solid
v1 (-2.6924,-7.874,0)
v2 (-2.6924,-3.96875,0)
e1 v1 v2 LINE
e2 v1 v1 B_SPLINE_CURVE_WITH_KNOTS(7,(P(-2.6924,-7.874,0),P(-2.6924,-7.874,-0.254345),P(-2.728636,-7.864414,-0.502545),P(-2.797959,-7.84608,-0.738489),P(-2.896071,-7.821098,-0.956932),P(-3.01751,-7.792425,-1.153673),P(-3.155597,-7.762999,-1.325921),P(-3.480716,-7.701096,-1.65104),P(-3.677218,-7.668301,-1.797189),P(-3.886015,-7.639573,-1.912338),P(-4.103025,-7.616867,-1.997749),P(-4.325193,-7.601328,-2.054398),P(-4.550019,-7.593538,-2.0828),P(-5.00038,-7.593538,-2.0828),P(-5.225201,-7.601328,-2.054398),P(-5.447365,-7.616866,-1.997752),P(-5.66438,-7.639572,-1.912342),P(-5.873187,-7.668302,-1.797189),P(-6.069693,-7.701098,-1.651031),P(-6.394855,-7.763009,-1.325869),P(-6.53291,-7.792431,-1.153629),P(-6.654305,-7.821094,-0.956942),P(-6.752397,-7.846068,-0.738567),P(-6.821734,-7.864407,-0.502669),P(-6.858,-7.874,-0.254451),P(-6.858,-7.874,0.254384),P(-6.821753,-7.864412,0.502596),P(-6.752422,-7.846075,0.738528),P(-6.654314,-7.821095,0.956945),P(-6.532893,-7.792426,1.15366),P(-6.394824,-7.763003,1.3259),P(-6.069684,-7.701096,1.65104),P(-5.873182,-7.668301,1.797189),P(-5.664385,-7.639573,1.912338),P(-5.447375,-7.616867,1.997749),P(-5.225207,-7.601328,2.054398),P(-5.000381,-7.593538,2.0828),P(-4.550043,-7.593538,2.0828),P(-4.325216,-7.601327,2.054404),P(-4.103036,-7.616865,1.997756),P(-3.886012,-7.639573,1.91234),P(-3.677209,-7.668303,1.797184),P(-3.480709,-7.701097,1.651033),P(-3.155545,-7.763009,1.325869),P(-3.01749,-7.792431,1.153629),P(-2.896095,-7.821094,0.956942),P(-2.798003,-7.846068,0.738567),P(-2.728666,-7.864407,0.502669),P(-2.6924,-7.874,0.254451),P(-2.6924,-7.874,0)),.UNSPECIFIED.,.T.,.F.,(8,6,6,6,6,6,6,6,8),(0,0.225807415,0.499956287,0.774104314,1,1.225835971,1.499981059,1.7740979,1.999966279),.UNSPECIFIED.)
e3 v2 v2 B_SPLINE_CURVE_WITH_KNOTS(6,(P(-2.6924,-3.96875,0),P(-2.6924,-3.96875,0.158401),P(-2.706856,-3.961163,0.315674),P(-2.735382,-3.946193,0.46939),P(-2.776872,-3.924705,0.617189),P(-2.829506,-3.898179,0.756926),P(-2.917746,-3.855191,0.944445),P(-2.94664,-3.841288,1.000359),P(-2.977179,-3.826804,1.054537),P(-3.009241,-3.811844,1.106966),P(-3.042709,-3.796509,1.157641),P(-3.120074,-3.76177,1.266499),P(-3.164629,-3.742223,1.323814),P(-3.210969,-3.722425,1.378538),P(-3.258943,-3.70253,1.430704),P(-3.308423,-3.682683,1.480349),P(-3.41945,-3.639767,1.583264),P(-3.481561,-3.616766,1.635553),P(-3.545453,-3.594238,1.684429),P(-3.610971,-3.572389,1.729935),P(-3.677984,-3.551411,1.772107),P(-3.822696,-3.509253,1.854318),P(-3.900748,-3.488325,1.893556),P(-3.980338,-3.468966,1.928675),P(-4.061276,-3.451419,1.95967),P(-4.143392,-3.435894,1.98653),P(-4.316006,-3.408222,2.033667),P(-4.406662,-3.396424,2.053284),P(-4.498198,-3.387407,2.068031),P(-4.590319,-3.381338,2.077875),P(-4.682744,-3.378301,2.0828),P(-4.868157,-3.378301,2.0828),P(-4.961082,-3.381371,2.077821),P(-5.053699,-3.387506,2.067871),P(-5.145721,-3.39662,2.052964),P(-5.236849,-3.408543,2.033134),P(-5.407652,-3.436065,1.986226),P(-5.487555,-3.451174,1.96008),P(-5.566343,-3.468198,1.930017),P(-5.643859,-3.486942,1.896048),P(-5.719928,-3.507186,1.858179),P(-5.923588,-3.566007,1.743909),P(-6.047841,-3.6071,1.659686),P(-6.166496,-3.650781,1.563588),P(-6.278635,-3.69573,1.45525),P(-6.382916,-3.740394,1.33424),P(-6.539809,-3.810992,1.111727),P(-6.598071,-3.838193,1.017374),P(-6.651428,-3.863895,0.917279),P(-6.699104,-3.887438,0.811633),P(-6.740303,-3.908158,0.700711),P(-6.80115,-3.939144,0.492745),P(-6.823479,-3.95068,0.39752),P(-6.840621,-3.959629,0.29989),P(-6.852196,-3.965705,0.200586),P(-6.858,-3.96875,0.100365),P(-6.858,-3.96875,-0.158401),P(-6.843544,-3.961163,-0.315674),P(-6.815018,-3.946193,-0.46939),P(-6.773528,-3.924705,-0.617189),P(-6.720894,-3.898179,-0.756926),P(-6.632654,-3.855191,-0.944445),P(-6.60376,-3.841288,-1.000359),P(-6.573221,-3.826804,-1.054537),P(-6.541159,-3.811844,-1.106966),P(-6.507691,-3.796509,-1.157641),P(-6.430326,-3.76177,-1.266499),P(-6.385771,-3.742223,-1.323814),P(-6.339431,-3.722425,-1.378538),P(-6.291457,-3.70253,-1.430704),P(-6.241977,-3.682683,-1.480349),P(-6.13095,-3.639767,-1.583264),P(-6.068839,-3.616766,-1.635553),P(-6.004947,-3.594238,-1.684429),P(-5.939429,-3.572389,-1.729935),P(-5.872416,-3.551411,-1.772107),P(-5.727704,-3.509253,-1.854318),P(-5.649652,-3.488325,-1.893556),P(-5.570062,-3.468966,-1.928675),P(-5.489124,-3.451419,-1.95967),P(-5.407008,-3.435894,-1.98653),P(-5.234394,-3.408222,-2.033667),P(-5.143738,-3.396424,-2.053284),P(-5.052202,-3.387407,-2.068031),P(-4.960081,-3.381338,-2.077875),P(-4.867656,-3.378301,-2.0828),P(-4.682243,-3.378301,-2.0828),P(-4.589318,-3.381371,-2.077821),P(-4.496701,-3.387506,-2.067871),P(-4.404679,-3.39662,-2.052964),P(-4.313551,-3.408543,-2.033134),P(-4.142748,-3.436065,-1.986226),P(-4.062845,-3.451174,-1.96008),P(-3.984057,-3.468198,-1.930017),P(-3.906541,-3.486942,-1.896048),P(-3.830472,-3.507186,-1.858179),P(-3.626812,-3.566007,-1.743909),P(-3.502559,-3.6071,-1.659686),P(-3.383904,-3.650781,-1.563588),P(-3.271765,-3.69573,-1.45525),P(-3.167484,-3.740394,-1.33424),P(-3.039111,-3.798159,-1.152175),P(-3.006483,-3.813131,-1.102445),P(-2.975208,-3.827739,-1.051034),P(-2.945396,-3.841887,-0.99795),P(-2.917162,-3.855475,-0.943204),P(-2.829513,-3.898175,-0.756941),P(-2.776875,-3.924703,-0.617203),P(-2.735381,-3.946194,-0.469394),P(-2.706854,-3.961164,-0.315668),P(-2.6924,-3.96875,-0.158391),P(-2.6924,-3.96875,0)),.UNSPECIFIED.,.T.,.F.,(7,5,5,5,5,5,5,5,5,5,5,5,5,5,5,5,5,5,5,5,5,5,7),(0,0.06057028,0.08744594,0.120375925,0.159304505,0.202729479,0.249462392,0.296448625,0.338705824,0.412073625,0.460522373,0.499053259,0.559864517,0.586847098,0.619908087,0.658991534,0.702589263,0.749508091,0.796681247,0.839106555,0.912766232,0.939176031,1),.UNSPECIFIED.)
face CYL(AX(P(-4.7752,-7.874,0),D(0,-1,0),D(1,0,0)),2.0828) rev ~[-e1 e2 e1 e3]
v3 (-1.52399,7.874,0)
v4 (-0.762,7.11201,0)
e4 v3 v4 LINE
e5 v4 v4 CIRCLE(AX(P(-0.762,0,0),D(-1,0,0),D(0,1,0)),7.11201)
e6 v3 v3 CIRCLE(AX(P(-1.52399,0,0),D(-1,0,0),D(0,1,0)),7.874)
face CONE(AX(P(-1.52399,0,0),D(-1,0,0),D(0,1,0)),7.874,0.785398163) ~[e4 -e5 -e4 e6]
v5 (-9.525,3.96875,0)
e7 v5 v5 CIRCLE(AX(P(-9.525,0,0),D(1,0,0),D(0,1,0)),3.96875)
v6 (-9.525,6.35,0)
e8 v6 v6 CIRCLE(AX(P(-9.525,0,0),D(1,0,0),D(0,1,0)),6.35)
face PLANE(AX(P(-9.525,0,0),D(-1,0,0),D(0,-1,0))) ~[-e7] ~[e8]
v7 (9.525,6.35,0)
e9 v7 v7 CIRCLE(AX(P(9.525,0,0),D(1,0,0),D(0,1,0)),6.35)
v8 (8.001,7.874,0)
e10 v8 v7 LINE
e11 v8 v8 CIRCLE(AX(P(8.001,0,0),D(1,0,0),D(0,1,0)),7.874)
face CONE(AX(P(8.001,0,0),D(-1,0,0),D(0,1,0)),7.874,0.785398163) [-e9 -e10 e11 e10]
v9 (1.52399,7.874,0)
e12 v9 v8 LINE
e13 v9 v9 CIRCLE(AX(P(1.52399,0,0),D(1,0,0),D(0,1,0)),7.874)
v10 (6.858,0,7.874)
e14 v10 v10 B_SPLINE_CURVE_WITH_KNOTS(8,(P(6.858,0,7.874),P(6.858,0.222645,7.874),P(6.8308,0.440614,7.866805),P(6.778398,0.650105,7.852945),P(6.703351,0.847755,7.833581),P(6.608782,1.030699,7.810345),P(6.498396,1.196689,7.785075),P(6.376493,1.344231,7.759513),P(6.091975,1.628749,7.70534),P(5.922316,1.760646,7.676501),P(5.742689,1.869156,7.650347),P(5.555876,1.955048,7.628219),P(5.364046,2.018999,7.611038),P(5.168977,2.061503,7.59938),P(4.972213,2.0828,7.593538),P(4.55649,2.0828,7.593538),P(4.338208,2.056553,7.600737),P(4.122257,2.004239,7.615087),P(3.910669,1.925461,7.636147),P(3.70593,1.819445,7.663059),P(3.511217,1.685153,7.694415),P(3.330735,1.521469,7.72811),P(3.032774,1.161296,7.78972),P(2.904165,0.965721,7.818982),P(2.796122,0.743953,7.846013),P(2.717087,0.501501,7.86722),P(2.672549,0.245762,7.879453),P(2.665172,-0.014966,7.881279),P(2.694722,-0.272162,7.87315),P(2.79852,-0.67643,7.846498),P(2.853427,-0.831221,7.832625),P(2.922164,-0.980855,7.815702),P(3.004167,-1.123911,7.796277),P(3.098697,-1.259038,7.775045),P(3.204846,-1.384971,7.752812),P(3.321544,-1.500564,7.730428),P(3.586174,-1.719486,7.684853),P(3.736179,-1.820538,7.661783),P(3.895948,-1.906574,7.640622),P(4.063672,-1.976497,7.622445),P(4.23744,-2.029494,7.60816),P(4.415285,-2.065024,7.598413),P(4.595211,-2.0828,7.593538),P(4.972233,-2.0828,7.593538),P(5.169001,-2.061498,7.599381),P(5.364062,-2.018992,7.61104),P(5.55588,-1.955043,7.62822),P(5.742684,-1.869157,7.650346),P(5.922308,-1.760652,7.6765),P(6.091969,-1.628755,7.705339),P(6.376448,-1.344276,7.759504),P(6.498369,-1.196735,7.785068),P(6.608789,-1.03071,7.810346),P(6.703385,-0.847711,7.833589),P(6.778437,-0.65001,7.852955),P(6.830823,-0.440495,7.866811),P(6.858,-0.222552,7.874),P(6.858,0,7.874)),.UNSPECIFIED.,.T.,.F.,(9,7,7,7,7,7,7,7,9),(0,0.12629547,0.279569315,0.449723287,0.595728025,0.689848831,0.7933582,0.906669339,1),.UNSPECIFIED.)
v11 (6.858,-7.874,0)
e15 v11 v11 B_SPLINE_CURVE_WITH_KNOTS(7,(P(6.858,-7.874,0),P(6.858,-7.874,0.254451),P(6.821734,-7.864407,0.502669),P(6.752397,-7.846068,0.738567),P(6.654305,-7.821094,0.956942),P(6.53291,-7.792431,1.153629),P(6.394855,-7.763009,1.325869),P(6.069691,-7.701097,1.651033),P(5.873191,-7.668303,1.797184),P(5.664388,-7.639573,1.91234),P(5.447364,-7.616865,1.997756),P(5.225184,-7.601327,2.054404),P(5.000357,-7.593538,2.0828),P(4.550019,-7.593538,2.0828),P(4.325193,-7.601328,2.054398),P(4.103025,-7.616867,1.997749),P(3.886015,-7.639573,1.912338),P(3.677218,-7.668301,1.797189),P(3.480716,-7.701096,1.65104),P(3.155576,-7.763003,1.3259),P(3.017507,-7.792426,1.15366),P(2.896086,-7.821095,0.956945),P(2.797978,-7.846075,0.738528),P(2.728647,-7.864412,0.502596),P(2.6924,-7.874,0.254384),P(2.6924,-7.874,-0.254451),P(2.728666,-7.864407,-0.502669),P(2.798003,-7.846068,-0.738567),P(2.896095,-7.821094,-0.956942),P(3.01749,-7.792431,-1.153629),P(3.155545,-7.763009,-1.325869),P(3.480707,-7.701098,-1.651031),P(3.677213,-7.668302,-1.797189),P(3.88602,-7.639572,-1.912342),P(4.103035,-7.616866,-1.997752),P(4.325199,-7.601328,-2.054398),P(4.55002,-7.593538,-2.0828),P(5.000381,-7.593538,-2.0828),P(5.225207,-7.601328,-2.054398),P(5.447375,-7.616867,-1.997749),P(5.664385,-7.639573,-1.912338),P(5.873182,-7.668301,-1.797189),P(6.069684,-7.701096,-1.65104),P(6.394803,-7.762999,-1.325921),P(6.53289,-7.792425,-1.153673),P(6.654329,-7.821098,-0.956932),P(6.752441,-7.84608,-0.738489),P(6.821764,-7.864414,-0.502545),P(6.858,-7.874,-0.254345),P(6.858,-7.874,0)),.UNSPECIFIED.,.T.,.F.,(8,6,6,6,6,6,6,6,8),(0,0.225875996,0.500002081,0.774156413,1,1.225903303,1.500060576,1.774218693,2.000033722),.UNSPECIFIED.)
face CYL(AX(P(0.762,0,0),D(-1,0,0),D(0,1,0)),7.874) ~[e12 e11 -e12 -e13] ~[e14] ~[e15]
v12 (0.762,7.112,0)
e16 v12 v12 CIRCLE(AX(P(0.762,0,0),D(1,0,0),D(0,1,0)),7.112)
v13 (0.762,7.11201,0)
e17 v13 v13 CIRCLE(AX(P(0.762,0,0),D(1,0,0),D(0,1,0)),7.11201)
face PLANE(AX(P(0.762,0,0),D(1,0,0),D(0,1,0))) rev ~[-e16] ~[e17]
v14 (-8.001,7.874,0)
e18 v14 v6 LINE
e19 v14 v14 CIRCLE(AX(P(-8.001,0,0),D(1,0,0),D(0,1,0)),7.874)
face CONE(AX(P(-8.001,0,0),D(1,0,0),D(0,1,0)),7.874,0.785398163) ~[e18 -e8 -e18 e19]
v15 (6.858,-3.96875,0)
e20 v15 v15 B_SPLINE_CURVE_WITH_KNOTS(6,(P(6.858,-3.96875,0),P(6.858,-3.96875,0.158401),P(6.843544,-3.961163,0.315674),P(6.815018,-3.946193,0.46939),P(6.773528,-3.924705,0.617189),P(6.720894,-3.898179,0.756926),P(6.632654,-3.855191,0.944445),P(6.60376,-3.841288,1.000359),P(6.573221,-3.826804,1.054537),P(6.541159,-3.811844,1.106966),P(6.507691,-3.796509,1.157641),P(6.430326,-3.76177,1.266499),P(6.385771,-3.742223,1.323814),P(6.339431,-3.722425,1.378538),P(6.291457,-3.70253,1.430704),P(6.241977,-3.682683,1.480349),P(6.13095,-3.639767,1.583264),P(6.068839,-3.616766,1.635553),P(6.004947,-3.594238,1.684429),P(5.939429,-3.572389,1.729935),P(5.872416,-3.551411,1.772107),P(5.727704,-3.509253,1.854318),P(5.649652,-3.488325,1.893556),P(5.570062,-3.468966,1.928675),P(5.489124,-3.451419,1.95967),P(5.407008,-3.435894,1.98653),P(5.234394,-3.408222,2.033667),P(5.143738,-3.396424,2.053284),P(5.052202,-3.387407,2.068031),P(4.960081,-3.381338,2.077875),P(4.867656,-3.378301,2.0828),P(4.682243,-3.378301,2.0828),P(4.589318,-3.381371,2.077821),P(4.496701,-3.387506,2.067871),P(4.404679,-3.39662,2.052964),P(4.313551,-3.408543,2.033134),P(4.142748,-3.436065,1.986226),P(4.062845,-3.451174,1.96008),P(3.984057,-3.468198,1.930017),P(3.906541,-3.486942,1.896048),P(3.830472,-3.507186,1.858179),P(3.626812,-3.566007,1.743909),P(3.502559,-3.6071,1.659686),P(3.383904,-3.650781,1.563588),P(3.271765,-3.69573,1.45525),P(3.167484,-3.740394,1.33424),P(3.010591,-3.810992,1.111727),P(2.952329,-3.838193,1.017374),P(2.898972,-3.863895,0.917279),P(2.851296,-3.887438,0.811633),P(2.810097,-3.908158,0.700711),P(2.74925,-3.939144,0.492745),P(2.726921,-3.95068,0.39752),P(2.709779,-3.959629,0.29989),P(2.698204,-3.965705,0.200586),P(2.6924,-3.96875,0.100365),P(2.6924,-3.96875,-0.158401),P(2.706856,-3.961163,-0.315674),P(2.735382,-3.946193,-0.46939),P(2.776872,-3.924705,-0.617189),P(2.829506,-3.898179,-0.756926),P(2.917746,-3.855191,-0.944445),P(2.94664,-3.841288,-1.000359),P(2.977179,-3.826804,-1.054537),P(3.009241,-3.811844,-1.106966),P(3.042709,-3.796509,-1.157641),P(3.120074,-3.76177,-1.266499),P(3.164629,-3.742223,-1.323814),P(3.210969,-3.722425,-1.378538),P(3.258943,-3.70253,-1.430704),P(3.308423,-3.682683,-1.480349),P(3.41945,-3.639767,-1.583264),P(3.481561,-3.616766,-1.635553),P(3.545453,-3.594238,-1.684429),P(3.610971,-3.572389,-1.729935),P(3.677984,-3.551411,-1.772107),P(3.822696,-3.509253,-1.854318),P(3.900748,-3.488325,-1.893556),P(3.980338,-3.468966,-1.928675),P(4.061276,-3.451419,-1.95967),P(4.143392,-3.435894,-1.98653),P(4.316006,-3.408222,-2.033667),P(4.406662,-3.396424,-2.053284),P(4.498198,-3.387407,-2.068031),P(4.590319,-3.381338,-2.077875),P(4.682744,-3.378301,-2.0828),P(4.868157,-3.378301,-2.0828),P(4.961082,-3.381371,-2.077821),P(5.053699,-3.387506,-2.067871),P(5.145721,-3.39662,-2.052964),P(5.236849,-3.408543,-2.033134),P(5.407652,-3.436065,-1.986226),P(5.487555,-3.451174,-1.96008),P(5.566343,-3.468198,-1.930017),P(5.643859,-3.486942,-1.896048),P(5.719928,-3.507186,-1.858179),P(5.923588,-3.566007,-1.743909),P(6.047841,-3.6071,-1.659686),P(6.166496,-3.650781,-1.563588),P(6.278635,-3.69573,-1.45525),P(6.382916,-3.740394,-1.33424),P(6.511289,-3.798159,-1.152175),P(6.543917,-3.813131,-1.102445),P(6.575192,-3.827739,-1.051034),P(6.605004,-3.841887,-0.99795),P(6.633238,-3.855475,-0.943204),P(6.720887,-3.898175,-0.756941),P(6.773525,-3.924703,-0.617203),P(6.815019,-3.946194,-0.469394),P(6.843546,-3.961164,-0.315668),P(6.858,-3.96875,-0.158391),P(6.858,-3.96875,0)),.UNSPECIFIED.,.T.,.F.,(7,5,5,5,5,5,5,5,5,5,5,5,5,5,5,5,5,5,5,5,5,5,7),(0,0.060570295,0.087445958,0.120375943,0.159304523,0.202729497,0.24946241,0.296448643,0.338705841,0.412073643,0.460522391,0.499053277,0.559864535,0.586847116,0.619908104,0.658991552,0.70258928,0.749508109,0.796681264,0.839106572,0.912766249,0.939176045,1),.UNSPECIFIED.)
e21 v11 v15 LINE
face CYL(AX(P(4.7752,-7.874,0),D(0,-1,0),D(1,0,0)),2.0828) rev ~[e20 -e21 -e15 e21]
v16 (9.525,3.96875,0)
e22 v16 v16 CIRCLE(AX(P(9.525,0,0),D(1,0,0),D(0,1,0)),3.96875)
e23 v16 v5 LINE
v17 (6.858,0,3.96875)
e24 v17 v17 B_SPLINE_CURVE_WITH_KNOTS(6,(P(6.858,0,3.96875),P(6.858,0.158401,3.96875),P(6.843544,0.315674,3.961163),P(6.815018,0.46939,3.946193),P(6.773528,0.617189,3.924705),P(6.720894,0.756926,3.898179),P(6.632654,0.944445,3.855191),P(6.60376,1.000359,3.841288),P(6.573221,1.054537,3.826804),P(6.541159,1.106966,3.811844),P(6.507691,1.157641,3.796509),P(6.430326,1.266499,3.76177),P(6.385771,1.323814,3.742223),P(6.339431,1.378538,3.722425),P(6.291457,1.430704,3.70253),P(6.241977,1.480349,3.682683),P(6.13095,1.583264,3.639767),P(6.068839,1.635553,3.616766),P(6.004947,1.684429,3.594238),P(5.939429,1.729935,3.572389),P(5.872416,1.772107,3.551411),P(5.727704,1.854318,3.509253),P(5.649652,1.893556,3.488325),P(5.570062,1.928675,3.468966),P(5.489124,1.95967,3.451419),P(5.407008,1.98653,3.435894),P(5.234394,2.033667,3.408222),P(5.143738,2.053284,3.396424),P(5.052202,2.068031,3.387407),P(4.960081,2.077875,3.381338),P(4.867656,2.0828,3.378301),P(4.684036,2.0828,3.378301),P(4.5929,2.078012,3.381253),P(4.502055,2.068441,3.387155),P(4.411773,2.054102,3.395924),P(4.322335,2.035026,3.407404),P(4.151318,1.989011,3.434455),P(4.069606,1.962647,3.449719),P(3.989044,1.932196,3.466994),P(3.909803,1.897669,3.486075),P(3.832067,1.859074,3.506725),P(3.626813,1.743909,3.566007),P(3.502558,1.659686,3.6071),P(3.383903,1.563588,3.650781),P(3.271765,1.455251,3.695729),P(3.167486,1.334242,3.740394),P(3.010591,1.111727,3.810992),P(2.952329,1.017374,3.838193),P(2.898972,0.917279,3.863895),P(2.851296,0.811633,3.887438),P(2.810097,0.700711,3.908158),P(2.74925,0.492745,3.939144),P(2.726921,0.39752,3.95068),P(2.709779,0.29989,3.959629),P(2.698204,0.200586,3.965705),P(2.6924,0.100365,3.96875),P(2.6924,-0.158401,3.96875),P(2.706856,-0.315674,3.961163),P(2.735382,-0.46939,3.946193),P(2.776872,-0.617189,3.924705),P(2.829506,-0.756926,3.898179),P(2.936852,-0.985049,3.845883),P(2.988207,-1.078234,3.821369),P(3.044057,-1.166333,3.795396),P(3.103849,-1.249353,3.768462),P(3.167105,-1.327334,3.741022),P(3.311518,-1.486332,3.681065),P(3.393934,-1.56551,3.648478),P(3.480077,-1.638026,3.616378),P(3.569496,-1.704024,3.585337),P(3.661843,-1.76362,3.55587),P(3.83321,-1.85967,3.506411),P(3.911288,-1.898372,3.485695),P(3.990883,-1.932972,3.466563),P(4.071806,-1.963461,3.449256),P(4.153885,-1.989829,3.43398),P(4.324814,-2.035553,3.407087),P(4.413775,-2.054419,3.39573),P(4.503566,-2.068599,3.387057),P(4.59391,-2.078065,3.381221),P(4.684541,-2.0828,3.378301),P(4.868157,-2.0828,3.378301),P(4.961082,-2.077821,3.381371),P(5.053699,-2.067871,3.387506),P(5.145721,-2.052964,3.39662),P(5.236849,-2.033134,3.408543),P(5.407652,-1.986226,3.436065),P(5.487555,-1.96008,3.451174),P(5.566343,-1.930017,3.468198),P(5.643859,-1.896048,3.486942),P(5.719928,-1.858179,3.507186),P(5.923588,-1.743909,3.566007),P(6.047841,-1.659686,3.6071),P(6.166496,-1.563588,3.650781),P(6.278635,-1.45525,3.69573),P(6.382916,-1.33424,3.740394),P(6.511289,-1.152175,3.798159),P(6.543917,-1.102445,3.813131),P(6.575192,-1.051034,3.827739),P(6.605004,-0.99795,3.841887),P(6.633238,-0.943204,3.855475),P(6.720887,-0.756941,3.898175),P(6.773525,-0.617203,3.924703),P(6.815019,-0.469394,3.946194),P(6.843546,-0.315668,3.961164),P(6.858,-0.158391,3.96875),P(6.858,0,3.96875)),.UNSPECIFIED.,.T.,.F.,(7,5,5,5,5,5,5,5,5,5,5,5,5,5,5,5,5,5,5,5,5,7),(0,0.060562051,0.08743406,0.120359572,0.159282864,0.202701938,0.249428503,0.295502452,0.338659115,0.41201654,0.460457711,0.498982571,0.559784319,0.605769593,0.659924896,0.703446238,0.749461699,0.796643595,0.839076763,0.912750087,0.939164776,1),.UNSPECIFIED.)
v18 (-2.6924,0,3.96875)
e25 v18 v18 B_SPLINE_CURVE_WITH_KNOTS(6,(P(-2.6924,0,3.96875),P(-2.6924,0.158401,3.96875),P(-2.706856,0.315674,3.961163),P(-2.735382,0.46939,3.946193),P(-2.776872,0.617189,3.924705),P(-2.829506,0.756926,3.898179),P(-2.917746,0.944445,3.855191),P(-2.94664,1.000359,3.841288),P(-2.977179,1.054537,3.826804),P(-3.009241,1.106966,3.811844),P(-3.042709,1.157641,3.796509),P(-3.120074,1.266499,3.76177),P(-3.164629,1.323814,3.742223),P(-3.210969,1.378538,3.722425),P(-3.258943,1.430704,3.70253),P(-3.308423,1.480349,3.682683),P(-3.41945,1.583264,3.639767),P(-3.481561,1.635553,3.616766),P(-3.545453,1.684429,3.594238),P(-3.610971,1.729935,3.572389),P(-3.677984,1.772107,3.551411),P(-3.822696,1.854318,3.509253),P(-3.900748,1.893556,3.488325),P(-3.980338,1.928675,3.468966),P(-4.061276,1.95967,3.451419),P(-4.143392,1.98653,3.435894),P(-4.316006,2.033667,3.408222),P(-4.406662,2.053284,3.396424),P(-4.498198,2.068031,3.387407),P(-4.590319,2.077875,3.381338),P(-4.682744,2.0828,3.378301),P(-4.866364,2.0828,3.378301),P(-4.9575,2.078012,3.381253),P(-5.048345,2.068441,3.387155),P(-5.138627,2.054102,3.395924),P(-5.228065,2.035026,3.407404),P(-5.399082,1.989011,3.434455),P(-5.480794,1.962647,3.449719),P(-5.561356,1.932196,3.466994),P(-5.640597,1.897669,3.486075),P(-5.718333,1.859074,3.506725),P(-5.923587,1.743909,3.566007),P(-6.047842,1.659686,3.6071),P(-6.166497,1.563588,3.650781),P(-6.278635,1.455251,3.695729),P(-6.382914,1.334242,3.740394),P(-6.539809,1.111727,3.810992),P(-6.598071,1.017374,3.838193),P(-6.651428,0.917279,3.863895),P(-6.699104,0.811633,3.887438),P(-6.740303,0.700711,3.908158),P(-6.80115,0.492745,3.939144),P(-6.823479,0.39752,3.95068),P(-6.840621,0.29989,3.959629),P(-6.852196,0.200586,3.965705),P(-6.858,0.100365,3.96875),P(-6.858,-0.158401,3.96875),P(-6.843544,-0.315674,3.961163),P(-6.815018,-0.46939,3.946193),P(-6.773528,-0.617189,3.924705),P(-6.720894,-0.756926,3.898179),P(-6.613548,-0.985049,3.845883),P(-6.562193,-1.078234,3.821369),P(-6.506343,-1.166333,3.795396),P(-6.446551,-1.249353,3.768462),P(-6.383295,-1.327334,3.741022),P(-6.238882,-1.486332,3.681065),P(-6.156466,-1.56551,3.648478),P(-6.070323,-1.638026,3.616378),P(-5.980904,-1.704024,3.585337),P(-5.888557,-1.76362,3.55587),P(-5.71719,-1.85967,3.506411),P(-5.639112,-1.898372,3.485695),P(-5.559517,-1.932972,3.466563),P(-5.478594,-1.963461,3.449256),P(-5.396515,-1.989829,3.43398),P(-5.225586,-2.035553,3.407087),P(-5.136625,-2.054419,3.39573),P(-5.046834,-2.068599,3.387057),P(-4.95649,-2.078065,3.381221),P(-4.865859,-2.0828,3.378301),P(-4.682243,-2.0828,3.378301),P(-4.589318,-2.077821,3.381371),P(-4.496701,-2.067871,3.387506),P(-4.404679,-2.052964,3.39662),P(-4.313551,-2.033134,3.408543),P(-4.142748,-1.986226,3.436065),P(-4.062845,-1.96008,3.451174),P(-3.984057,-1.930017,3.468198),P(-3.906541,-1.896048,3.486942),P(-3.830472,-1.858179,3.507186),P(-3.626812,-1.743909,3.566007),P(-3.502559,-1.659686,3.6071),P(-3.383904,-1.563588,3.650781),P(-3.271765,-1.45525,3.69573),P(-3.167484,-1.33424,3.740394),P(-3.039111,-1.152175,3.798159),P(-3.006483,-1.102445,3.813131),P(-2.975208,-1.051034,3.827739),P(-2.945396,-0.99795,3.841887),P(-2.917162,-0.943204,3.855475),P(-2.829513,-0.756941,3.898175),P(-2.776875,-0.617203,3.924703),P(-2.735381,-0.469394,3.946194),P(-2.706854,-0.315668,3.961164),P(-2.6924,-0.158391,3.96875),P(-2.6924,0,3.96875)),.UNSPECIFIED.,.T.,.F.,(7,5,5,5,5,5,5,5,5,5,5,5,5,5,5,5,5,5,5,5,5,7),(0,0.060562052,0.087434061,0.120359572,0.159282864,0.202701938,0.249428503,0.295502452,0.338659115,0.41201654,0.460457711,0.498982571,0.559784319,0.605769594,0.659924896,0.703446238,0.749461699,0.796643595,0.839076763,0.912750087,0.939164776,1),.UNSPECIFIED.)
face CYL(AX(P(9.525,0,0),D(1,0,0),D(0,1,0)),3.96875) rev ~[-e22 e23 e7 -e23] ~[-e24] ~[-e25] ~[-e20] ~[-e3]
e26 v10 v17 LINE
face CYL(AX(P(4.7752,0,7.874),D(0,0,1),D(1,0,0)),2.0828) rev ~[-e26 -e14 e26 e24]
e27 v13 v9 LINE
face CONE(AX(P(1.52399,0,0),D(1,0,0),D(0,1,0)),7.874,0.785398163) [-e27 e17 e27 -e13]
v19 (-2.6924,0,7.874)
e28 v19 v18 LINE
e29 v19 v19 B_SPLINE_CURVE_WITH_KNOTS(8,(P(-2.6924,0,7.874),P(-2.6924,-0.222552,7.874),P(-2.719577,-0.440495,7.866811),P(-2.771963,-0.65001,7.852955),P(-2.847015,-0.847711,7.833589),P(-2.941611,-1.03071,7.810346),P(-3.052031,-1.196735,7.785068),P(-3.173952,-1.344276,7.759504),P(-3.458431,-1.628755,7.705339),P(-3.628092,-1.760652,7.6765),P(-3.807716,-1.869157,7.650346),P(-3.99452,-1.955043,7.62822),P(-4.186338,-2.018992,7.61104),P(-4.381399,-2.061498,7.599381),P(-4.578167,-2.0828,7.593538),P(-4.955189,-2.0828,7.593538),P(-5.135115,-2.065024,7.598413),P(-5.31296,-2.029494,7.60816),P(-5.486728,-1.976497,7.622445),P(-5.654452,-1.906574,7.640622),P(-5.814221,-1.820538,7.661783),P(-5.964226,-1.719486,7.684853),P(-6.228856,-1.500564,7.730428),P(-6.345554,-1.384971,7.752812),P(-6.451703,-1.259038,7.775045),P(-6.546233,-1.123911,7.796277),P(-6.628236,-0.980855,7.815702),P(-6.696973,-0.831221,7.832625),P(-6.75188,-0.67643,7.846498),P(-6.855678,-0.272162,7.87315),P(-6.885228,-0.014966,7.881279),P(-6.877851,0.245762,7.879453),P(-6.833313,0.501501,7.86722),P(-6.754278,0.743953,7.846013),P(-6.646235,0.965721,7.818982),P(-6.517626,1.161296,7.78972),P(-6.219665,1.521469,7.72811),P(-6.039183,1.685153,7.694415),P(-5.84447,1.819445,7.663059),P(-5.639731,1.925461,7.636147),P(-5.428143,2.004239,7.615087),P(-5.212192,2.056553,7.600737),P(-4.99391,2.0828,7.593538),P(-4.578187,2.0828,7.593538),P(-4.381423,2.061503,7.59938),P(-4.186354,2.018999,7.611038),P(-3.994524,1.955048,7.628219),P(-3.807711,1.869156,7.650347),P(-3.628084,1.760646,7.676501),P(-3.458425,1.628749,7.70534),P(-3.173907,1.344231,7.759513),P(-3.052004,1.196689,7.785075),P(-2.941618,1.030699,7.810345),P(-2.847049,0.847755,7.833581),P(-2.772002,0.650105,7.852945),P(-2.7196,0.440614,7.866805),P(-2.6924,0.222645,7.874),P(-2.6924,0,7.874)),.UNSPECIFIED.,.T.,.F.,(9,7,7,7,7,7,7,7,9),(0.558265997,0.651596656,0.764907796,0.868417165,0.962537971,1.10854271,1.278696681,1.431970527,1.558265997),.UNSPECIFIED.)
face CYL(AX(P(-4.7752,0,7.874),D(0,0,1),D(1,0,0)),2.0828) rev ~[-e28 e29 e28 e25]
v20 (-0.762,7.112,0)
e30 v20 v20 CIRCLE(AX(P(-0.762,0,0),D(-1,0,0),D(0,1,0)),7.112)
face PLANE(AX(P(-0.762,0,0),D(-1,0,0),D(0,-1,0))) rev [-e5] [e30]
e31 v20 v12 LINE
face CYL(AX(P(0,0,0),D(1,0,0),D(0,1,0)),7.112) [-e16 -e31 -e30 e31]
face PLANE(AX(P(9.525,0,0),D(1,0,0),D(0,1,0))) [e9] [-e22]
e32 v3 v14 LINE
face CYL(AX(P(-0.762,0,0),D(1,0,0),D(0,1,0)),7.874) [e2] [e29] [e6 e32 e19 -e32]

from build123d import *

# Parameters (mm, degrees)
F0_R          = 7.112
F1_DEPTH      = 0.762
F1_DEPTH_BACK = 0.762
F2_R          = 7.874
F2_R_2        = 7.112
F3_DEPTH      = 8.763
F4_R          = 7.874
F4_R_2        = 7.112
F5_DEPTH      = 8.763
F9_R          = 3.96875
F10_DEPTH     = 25.4
F8_R          = 2.0828
F11_DEPTH     = 7.62
F14_R         = 2.0828
F15_DEPTH     = 7.874
F16_SIZE      = 1.524
F17_SIZE      = 0.76199


# Not quite as in the source:
# - a fillet or chamfer is up to 0.001 mm smaller than in the source, because OpenCascade refuses the exact size
# - a pattern or mirror of a feature is missing from the dataset's text; its kind, count and spacing are read off the source's solid


with BuildPart() as f1:
    # F0 (on Right) → F1 (new body, two sides)
    with BuildSketch(Plane.YZ) as f1_sk:
        Circle(F0_R)
    extrude(amount=F1_DEPTH)
    extrude(f1_sk.sketch, amount=-F1_DEPTH_BACK)

    # F2 (on face) → F3 (join)
    with BuildSketch(Plane.YZ.offset(0.762)):
        Circle(F2_R)
        Circle(F2_R_2, mode=Mode.SUBTRACT)
        Circle(F2_R_2)
    f3 = extrude(amount=F3_DEPTH)

    # F3_copies: F3 across plane
    add(f3.mirror(Plane(origin=(0, 0, 0), x_dir=(0, 0, -1), z_dir=(-1, 0, 0))))

    # F4 (on face) → F5 (join)
    with BuildSketch(Plane(origin=(-0.762, 0, 0), x_dir=(0, -1, 0), z_dir=(-1, 0, 0))):
        Circle(F4_R)
        Circle(F4_R_2, mode=Mode.SUBTRACT)
    extrude(amount=F5_DEPTH)

    # F9 (on face) → F10 (cut)
    with BuildSketch(Plane.YZ.offset(9.525)):
        Circle(F9_R)
    extrude(amount=-F10_DEPTH, mode=Mode.SUBTRACT)

    # F8 (on plane+point) → F11 (cut)
    with BuildSketch(Plane.XY.offset(7.874)):
        with Locations((4.7752, 0)):
            Circle(F8_R)
        with Locations((-4.7752, 0)):
            Circle(F8_R)
    extrude(amount=-F11_DEPTH, mode=Mode.SUBTRACT)

    # F14 (on plane+point) → F15 (cut)
    with BuildSketch(Plane.XZ.offset(7.874)):
        with Locations((4.7752, 0)):
            Circle(F14_R)
        with Locations((-4.7752, 0)):
            Circle(F14_R)
    extrude(amount=-F15_DEPTH, mode=Mode.SUBTRACT)

    # F16
    f16_edges = [f1.edges().sort_by_distance(p)[0] for p in [
        (9.525, -7.874, 0),
        (-9.525, -7.874, 0),
    ]]
    chamfer(f16_edges, length=F16_SIZE)

    # F17 (size 0.762 in the source; OpenCascade refuses exactly that, so slightly less here)
    f17_edges = [f1.edges().sort_by_distance(p)[0] for p in [
        (0.762, -7.874, 0),
        (-0.762, -7.874, 0),
    ]]
    chamfer(f17_edges, length=F17_SIZE)


solid = f1.part
